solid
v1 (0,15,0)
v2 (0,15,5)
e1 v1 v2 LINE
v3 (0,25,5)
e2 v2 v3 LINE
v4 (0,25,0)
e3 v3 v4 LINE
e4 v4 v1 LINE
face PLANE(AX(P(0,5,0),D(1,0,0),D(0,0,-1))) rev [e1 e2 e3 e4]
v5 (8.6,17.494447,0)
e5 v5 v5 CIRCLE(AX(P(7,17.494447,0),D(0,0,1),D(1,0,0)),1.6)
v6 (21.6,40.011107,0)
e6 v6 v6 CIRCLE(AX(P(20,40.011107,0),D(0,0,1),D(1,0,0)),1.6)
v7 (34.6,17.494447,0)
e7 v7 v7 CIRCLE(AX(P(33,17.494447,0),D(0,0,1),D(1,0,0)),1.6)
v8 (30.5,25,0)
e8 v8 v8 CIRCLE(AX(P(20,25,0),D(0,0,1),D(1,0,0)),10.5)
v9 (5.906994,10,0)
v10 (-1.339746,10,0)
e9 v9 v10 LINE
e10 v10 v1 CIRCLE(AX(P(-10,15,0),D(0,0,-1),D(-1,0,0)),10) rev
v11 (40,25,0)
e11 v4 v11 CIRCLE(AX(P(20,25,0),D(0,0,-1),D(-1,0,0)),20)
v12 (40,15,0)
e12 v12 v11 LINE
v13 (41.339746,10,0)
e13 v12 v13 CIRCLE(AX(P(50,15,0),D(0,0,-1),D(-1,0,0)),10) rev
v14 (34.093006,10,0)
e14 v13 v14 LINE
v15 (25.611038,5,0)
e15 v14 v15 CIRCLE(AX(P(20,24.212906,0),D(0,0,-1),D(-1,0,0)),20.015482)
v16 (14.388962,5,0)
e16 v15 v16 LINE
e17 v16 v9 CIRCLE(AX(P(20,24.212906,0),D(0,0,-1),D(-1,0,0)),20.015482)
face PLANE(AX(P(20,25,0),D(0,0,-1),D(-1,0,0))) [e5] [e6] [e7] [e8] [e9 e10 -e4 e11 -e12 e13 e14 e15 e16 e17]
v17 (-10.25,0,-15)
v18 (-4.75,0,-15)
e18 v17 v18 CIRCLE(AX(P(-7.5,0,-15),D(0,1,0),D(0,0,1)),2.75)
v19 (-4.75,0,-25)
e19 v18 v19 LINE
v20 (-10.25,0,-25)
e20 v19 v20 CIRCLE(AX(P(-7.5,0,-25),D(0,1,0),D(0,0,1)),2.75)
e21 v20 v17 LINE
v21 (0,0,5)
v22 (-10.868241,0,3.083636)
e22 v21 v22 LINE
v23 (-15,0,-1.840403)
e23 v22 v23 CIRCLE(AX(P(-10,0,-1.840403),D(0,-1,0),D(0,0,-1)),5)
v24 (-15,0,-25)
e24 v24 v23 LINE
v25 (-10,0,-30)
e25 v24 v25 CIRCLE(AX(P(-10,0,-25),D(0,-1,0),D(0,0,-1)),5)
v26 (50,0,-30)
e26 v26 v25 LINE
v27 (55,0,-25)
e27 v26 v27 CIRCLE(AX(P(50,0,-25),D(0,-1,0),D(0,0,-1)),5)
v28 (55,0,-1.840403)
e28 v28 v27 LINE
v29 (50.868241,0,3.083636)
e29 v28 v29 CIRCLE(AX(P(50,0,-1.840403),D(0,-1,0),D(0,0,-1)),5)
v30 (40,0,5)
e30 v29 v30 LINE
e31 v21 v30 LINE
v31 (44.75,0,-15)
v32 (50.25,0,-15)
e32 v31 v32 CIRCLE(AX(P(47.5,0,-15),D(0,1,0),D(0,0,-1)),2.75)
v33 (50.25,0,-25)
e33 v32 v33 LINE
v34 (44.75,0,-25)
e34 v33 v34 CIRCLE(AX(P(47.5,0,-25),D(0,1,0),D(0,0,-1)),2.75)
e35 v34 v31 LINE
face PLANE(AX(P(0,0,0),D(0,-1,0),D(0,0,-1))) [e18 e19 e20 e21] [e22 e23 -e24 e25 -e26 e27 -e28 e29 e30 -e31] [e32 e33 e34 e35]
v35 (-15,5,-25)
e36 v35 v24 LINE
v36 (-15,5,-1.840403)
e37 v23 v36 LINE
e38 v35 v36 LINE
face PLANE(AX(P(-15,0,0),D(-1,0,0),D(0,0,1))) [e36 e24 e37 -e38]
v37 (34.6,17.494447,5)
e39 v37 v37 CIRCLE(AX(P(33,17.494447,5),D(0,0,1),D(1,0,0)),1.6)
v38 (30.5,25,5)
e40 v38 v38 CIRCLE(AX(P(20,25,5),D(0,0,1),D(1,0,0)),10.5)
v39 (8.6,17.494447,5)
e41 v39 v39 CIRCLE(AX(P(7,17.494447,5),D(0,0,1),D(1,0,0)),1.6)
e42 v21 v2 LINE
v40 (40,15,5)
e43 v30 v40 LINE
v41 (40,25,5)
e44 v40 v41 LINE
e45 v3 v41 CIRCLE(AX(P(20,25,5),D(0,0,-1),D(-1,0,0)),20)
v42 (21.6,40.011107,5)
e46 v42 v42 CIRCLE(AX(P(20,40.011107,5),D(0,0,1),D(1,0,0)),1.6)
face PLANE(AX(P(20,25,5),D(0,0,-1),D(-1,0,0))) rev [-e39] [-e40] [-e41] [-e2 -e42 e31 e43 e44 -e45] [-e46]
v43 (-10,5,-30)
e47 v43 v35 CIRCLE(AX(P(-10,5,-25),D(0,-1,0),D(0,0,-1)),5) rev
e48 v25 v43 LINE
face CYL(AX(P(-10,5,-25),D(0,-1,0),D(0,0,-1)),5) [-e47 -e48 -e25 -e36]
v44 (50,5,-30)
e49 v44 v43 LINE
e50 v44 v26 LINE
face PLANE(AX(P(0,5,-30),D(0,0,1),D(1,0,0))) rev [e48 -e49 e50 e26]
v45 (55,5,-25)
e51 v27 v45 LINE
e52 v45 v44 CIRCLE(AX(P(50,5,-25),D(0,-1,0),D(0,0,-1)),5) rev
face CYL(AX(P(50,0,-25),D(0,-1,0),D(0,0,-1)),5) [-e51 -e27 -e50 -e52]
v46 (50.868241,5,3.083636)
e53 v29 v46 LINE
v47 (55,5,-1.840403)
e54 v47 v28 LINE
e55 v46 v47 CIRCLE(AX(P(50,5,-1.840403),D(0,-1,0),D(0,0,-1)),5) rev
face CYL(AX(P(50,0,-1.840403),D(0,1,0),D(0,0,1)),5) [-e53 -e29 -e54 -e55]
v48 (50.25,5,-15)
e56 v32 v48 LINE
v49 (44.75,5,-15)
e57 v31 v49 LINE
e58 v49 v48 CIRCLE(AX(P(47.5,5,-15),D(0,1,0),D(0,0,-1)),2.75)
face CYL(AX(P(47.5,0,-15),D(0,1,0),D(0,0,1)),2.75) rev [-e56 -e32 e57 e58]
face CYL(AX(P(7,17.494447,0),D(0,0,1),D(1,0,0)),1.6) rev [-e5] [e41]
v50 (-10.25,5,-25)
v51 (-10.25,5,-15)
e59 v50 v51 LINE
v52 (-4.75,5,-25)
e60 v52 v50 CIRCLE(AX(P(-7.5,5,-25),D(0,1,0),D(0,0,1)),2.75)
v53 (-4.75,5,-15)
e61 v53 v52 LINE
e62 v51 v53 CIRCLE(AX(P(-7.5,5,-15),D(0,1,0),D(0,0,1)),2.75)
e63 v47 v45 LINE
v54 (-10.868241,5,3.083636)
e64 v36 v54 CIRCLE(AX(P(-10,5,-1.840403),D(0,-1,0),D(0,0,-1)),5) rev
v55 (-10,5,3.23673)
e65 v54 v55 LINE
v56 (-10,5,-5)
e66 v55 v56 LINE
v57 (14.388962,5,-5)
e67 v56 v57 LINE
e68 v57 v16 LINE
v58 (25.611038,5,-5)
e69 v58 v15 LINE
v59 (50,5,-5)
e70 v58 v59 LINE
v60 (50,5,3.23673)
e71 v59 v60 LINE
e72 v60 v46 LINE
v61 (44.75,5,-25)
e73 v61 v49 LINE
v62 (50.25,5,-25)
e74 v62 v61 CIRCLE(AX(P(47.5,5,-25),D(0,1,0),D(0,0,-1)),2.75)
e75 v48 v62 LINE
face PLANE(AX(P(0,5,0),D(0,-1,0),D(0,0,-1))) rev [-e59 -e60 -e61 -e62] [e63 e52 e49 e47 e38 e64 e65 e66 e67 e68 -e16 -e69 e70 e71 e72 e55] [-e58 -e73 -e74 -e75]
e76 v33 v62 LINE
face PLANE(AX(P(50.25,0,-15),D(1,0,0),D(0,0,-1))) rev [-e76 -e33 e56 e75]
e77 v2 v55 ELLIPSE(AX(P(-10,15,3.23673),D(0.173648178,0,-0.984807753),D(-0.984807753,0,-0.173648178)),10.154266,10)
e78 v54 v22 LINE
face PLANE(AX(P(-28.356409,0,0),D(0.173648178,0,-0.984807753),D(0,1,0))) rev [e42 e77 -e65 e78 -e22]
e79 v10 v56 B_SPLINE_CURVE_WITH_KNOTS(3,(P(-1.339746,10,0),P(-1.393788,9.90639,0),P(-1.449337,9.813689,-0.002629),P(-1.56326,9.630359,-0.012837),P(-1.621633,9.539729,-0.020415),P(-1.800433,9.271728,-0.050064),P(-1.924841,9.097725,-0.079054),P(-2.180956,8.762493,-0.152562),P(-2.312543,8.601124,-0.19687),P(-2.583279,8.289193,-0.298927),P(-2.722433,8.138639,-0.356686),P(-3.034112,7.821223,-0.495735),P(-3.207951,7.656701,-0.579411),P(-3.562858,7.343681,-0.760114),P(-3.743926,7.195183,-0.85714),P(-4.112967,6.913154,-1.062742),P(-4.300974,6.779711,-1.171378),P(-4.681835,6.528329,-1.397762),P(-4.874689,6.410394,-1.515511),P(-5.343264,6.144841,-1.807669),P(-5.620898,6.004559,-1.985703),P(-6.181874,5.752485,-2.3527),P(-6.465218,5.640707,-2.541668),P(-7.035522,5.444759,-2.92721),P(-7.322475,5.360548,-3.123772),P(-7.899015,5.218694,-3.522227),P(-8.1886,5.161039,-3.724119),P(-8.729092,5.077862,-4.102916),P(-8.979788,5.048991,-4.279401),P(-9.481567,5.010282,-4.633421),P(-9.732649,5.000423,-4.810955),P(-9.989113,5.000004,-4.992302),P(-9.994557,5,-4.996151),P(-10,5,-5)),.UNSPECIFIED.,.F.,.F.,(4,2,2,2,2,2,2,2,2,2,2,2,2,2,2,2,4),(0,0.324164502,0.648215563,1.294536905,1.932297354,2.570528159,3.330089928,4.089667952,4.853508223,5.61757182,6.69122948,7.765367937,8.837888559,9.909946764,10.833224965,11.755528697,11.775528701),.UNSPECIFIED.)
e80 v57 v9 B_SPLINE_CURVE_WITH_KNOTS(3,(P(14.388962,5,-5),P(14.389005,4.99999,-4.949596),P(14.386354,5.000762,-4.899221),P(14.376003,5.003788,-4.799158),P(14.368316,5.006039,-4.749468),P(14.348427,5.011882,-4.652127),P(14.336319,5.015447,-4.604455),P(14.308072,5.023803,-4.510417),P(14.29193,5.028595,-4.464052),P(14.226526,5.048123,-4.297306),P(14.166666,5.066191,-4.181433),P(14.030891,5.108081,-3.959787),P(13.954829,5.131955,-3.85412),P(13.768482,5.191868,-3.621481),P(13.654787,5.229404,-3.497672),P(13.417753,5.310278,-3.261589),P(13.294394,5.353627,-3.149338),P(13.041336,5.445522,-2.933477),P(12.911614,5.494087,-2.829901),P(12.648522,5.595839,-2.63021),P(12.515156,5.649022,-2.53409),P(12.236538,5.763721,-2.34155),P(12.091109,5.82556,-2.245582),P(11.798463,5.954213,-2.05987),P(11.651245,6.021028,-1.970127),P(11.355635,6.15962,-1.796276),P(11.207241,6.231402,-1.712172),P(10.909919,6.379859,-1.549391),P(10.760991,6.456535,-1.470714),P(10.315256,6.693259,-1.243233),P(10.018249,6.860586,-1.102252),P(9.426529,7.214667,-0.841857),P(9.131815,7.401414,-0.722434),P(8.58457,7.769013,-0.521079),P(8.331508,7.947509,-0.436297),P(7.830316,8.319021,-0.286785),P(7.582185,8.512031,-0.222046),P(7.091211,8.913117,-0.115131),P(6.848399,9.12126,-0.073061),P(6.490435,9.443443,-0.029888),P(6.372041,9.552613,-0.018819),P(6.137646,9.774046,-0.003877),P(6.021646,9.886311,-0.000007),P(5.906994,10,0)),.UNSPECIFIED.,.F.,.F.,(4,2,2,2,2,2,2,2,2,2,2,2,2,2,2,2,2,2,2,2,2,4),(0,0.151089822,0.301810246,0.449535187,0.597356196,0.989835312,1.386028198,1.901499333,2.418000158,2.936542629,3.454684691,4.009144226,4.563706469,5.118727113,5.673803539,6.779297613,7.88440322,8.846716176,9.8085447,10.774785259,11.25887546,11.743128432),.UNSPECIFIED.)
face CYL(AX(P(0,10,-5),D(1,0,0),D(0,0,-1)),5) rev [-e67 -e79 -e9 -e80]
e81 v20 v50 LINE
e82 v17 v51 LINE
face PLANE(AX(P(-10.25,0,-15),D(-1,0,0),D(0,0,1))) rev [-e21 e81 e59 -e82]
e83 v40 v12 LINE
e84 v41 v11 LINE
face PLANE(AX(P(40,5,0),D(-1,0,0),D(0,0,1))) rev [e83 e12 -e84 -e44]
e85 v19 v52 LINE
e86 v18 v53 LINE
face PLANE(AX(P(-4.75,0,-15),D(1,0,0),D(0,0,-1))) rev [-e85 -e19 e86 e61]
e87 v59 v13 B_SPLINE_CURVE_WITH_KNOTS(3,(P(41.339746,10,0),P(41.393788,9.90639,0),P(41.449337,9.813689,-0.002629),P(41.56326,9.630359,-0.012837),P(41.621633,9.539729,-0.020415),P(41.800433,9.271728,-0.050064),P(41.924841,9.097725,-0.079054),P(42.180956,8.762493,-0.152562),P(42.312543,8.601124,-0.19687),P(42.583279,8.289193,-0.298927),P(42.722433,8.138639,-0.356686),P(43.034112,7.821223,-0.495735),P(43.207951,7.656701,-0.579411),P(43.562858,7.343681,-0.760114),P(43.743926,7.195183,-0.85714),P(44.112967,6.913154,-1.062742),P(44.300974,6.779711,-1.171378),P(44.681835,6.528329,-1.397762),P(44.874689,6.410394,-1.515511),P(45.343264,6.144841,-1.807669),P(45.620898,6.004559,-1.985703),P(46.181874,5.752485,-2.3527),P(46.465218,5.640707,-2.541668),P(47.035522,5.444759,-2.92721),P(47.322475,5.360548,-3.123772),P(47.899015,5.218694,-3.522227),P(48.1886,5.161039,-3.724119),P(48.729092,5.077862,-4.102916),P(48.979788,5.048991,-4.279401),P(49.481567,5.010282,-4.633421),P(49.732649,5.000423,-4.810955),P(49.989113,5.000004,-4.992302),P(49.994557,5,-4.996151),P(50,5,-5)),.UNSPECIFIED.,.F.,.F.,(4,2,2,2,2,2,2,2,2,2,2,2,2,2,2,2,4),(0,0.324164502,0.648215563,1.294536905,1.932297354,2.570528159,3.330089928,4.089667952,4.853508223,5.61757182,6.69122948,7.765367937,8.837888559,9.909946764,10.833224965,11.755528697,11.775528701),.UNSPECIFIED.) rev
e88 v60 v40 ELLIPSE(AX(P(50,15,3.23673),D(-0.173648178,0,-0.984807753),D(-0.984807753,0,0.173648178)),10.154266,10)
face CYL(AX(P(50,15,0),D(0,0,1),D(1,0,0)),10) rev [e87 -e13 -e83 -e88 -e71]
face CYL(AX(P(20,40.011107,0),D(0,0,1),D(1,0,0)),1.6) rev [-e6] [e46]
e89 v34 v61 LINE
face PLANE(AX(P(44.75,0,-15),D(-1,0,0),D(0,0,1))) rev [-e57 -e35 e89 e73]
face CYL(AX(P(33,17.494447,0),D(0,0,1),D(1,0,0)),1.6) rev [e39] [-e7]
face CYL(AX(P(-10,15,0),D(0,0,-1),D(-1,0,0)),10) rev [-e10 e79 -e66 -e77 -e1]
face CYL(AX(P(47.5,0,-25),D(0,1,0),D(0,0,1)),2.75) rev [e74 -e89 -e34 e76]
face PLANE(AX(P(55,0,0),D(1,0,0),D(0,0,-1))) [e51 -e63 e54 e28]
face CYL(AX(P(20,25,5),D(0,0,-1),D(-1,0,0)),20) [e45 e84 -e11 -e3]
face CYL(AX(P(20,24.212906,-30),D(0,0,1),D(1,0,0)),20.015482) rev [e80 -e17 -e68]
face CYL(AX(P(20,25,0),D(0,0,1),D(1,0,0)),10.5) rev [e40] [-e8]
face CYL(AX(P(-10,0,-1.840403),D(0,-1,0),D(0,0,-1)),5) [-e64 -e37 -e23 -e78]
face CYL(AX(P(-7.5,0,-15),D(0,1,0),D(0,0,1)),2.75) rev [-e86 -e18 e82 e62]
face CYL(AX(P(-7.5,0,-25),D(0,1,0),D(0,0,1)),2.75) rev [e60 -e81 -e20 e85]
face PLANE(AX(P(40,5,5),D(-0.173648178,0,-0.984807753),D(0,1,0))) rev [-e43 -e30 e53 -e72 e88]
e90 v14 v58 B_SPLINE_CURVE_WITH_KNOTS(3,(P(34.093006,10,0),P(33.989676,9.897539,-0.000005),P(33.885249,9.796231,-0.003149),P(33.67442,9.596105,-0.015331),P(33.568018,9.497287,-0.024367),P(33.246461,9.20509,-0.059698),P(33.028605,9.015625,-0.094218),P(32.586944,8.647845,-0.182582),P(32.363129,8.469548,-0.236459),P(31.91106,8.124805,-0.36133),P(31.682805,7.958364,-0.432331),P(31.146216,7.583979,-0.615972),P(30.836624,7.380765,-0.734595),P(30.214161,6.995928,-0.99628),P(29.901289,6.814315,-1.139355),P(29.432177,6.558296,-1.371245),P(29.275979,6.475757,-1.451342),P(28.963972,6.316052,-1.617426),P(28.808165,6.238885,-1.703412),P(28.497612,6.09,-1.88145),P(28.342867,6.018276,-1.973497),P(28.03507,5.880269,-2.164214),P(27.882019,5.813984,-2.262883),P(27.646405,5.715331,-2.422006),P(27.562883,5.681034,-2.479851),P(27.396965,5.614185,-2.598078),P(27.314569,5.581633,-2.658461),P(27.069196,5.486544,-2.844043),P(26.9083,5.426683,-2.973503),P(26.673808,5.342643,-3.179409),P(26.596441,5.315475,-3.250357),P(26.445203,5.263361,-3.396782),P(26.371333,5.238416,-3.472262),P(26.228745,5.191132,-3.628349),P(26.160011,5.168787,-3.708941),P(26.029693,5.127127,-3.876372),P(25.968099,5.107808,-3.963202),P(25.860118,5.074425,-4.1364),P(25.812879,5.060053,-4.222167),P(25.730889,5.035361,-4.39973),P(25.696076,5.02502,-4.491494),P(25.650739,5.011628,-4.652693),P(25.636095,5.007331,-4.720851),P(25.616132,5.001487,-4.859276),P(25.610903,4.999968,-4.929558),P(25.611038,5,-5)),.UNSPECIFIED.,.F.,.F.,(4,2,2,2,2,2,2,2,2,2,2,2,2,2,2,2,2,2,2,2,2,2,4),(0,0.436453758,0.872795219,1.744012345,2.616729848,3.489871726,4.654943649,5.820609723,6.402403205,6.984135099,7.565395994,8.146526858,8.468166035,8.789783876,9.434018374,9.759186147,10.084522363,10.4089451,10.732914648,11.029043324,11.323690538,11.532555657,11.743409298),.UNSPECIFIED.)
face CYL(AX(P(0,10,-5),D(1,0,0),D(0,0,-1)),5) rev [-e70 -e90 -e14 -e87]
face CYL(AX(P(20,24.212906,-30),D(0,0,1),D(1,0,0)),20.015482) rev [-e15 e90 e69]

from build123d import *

# Parameters (mm, degrees)
SKETCH1_W           = 40
SKETCH1_H           = 30
BOSS_EXTRUDE1_DEPTH = 5
BOSS_EXTRUDE2_DEPTH = 5
SKETCH4_R           = 10.5
SKETCH4_R_2         = 1.6
CUT_EXTRUDE2_DEPTH  = 5
SKETCH5_W           = 15
SKETCH5_H           = 30
BOSS_EXTRUDE3_DEPTH = 5
CHAMFER1_SIZE       = 5
CHAMFER1_SIZE_2     = 28.356409098
CHAMFER2_SIZE       = 5
CHAMFER2_SIZE_2     = 28.356409098
FILLET1_R           = 10
FILLET2_R           = 5
FILLET4_R           = 5
CUT_EXTRUDE3_DEPTH  = 78.136243103


with BuildPart() as part:
    # Sketch1 → Boss-Extrude1 (new body)
    with BuildSketch(Plane(origin=(0, 0, 0), x_dir=(1, 0, 0), z_dir=(0, 1, 0))):
        with Locations((20, 15)):
            Rectangle(SKETCH1_W, SKETCH1_H)
    extrude(amount=BOSS_EXTRUDE1_DEPTH)

    # Sketch2 → Boss-Extrude2 (add)
    with BuildSketch(Plane.XY):
        with BuildLine():
            Line((0, 5), (0, 25))
            ThreePointArc((0, 25), (20, 45), (40, 25))
            Line((40, 25), (40, 5))
            Line((40, 5), (40, 0))
            Line((40, 0), (0, 0))
            Line((0, 0), (0, 5))
        make_face()
    extrude(amount=BOSS_EXTRUDE2_DEPTH)

    # Sketch4 → Cut-Extrude2 (cut)
    with BuildSketch(Plane.XY.offset(5)):
        with Locations((20, 25)):
            Circle(SKETCH4_R)
        with Locations((20, 40.011106999)):
            Circle(SKETCH4_R_2)
        with Locations((7, 17.494446501)):
            Circle(SKETCH4_R_2)
        with Locations((33, 17.494446501)):
            Circle(SKETCH4_R_2)
    extrude(amount=-CUT_EXTRUDE2_DEPTH, mode=Mode.SUBTRACT)

    # Sketch5 → Boss-Extrude3 (add)
    # profile 1 of 2: a face of its own
    with BuildSketch(Plane(origin=(0, 5, 0), x_dir=(1, 0, 0), z_dir=(0, 1, 0))):
        with Locations((-7.5, 15)):
            Rectangle(SKETCH5_W, SKETCH5_H)
        with BuildLine():
            Line((-10.25, 15), (-10.25, 25))
            ThreePointArc((-10.25, 25), (-7.5, 27.75), (-4.75, 25))
            Line((-4.75, 25), (-4.75, 15))
            ThreePointArc((-4.75, 15), (-7.5, 12.25), (-10.25, 15))
        make_face(mode=Mode.SUBTRACT)
    # profile 2 of 2: a face of its own
    with BuildSketch(Plane(origin=(0, 5, 0), x_dir=(1, 0, 0), z_dir=(0, 1, 0))):
        with Locations((47.5, 15)):
            Rectangle(SKETCH5_W, SKETCH5_H)
        with BuildLine():
            Line((50.25, 15), (50.25, 25))
            ThreePointArc((50.25, 25), (47.5, 27.75), (44.75, 25))
            Line((44.75, 25), (44.75, 15))
            ThreePointArc((44.75, 15), (47.5, 12.25), (50.25, 15))
        make_face(mode=Mode.SUBTRACT)
    extrude(amount=-BOSS_EXTRUDE3_DEPTH)

    # Chamfer1
    # the kernel refuses this chamfer: 28.356409098, 5 mm, written as the material it adds along each edge
    with BuildSketch(Plane(origin=(0, 5, 0), x_dir=(0.21013876076743523, 0, 0.9776715712462578), z_dir=(0, -1, 0))) as chamfer1_piece_1_section:
        Polygon((CHAMFER1_SIZE * 0.977671571246, CHAMFER1_SIZE * 0.210138760767), (-CHAMFER1_SIZE_2 * 0.210138760768, CHAMFER1_SIZE_2 * 0.977671571249), (0, 0), align=None)
    chamfer1_piece_1 = extrude(amount=5, mode=Mode.PRIVATE)
    chamfer1_piece_1 = split(chamfer1_piece_1, bisect_by=Plane(origin=(-6.173112567, 2.5, 5), z_dir=(0, 0, -1)), keep=Keep.TOP, mode=Mode.PRIVATE)
    chamfer1_piece_1 = split(chamfer1_piece_1, bisect_by=Plane(origin=(-15, 2.5, 1.987176297), z_dir=(1, 0, 0)), keep=Keep.TOP, mode=Mode.PRIVATE)
    add(chamfer1_piece_1)

    # Chamfer2
    # the kernel refuses this chamfer: 28.356409098, 5 mm, written as the material it adds along each edge
    with BuildSketch(Plane(origin=(40, 5, 0), x_dir=(-0.2101387607674354, 0, 0.9776715712462578), z_dir=(0, -1, 0))) as chamfer2_piece_1_section:
        Polygon((CHAMFER2_SIZE * 0.977671571246, -CHAMFER2_SIZE * 0.210138760767), (-CHAMFER2_SIZE_2 * 0.210138760768, -CHAMFER2_SIZE_2 * 0.977671571249), (0, 0), align=None)
    chamfer2_piece_1 = extrude(amount=5, mode=Mode.PRIVATE)
    chamfer2_piece_1 = split(chamfer2_piece_1, bisect_by=Plane(origin=(46.173112567, 2.5, 5), z_dir=(0, 0, -1)), keep=Keep.TOP, mode=Mode.PRIVATE)
    chamfer2_piece_1 = split(chamfer2_piece_1, bisect_by=Plane(origin=(55, 2.5, 1.987176297), z_dir=(-1, 0, 0)), keep=Keep.TOP, mode=Mode.PRIVATE)
    add(chamfer2_piece_1)

    # Fillet1
    fillet1_edges = [part.edges().sort_by_distance(p)[0] for p in [
        (40, 5, 2.5),
        (0, 5, 2.5),
    ]]
    fillet(fillet1_edges, radius=FILLET1_R)

    # Fillet2
    fillet2_edges = [part.edges().sort_by_distance(p)[0] for p in [
        (55, 2.5, 2.355095289),
        (-15, 2.5, -30),
        (55, 2.5, -30),
        (-15, 2.5, 2.355095289),
    ]]
    fillet(fillet2_edges, radius=FILLET2_R)

    # Fillet4
    fillet4_edges = [part.edges().sort_by_distance(p)[0] for p in [
        (20, 5, 0),
    ]]
    fillet(fillet4_edges, radius=FILLET4_R)

    # Sketch6 → Cut-Extrude3 (cut, through all)
    with BuildSketch(Plane(origin=(0, 0, 0), x_dir=(-1, 0, 0), z_dir=(0, 0, -1))):
        with BuildLine():
            Line((-25.611038109, 5), (-14.388961891, 5))
            ThreePointArc((-14.388961891, 5), (-3.752498092, 12.523671995), (0, 25))
            ThreePointArc((0, 25), (-20, 45), (-40, 25))
            ThreePointArc((-40, 25), (-36.247501908, 12.523671995), (-25.611038109, 5))
        make_face()
    extrude(amount=CUT_EXTRUDE3_DEPTH, mode=Mode.SUBTRACT)


solid = part.part
